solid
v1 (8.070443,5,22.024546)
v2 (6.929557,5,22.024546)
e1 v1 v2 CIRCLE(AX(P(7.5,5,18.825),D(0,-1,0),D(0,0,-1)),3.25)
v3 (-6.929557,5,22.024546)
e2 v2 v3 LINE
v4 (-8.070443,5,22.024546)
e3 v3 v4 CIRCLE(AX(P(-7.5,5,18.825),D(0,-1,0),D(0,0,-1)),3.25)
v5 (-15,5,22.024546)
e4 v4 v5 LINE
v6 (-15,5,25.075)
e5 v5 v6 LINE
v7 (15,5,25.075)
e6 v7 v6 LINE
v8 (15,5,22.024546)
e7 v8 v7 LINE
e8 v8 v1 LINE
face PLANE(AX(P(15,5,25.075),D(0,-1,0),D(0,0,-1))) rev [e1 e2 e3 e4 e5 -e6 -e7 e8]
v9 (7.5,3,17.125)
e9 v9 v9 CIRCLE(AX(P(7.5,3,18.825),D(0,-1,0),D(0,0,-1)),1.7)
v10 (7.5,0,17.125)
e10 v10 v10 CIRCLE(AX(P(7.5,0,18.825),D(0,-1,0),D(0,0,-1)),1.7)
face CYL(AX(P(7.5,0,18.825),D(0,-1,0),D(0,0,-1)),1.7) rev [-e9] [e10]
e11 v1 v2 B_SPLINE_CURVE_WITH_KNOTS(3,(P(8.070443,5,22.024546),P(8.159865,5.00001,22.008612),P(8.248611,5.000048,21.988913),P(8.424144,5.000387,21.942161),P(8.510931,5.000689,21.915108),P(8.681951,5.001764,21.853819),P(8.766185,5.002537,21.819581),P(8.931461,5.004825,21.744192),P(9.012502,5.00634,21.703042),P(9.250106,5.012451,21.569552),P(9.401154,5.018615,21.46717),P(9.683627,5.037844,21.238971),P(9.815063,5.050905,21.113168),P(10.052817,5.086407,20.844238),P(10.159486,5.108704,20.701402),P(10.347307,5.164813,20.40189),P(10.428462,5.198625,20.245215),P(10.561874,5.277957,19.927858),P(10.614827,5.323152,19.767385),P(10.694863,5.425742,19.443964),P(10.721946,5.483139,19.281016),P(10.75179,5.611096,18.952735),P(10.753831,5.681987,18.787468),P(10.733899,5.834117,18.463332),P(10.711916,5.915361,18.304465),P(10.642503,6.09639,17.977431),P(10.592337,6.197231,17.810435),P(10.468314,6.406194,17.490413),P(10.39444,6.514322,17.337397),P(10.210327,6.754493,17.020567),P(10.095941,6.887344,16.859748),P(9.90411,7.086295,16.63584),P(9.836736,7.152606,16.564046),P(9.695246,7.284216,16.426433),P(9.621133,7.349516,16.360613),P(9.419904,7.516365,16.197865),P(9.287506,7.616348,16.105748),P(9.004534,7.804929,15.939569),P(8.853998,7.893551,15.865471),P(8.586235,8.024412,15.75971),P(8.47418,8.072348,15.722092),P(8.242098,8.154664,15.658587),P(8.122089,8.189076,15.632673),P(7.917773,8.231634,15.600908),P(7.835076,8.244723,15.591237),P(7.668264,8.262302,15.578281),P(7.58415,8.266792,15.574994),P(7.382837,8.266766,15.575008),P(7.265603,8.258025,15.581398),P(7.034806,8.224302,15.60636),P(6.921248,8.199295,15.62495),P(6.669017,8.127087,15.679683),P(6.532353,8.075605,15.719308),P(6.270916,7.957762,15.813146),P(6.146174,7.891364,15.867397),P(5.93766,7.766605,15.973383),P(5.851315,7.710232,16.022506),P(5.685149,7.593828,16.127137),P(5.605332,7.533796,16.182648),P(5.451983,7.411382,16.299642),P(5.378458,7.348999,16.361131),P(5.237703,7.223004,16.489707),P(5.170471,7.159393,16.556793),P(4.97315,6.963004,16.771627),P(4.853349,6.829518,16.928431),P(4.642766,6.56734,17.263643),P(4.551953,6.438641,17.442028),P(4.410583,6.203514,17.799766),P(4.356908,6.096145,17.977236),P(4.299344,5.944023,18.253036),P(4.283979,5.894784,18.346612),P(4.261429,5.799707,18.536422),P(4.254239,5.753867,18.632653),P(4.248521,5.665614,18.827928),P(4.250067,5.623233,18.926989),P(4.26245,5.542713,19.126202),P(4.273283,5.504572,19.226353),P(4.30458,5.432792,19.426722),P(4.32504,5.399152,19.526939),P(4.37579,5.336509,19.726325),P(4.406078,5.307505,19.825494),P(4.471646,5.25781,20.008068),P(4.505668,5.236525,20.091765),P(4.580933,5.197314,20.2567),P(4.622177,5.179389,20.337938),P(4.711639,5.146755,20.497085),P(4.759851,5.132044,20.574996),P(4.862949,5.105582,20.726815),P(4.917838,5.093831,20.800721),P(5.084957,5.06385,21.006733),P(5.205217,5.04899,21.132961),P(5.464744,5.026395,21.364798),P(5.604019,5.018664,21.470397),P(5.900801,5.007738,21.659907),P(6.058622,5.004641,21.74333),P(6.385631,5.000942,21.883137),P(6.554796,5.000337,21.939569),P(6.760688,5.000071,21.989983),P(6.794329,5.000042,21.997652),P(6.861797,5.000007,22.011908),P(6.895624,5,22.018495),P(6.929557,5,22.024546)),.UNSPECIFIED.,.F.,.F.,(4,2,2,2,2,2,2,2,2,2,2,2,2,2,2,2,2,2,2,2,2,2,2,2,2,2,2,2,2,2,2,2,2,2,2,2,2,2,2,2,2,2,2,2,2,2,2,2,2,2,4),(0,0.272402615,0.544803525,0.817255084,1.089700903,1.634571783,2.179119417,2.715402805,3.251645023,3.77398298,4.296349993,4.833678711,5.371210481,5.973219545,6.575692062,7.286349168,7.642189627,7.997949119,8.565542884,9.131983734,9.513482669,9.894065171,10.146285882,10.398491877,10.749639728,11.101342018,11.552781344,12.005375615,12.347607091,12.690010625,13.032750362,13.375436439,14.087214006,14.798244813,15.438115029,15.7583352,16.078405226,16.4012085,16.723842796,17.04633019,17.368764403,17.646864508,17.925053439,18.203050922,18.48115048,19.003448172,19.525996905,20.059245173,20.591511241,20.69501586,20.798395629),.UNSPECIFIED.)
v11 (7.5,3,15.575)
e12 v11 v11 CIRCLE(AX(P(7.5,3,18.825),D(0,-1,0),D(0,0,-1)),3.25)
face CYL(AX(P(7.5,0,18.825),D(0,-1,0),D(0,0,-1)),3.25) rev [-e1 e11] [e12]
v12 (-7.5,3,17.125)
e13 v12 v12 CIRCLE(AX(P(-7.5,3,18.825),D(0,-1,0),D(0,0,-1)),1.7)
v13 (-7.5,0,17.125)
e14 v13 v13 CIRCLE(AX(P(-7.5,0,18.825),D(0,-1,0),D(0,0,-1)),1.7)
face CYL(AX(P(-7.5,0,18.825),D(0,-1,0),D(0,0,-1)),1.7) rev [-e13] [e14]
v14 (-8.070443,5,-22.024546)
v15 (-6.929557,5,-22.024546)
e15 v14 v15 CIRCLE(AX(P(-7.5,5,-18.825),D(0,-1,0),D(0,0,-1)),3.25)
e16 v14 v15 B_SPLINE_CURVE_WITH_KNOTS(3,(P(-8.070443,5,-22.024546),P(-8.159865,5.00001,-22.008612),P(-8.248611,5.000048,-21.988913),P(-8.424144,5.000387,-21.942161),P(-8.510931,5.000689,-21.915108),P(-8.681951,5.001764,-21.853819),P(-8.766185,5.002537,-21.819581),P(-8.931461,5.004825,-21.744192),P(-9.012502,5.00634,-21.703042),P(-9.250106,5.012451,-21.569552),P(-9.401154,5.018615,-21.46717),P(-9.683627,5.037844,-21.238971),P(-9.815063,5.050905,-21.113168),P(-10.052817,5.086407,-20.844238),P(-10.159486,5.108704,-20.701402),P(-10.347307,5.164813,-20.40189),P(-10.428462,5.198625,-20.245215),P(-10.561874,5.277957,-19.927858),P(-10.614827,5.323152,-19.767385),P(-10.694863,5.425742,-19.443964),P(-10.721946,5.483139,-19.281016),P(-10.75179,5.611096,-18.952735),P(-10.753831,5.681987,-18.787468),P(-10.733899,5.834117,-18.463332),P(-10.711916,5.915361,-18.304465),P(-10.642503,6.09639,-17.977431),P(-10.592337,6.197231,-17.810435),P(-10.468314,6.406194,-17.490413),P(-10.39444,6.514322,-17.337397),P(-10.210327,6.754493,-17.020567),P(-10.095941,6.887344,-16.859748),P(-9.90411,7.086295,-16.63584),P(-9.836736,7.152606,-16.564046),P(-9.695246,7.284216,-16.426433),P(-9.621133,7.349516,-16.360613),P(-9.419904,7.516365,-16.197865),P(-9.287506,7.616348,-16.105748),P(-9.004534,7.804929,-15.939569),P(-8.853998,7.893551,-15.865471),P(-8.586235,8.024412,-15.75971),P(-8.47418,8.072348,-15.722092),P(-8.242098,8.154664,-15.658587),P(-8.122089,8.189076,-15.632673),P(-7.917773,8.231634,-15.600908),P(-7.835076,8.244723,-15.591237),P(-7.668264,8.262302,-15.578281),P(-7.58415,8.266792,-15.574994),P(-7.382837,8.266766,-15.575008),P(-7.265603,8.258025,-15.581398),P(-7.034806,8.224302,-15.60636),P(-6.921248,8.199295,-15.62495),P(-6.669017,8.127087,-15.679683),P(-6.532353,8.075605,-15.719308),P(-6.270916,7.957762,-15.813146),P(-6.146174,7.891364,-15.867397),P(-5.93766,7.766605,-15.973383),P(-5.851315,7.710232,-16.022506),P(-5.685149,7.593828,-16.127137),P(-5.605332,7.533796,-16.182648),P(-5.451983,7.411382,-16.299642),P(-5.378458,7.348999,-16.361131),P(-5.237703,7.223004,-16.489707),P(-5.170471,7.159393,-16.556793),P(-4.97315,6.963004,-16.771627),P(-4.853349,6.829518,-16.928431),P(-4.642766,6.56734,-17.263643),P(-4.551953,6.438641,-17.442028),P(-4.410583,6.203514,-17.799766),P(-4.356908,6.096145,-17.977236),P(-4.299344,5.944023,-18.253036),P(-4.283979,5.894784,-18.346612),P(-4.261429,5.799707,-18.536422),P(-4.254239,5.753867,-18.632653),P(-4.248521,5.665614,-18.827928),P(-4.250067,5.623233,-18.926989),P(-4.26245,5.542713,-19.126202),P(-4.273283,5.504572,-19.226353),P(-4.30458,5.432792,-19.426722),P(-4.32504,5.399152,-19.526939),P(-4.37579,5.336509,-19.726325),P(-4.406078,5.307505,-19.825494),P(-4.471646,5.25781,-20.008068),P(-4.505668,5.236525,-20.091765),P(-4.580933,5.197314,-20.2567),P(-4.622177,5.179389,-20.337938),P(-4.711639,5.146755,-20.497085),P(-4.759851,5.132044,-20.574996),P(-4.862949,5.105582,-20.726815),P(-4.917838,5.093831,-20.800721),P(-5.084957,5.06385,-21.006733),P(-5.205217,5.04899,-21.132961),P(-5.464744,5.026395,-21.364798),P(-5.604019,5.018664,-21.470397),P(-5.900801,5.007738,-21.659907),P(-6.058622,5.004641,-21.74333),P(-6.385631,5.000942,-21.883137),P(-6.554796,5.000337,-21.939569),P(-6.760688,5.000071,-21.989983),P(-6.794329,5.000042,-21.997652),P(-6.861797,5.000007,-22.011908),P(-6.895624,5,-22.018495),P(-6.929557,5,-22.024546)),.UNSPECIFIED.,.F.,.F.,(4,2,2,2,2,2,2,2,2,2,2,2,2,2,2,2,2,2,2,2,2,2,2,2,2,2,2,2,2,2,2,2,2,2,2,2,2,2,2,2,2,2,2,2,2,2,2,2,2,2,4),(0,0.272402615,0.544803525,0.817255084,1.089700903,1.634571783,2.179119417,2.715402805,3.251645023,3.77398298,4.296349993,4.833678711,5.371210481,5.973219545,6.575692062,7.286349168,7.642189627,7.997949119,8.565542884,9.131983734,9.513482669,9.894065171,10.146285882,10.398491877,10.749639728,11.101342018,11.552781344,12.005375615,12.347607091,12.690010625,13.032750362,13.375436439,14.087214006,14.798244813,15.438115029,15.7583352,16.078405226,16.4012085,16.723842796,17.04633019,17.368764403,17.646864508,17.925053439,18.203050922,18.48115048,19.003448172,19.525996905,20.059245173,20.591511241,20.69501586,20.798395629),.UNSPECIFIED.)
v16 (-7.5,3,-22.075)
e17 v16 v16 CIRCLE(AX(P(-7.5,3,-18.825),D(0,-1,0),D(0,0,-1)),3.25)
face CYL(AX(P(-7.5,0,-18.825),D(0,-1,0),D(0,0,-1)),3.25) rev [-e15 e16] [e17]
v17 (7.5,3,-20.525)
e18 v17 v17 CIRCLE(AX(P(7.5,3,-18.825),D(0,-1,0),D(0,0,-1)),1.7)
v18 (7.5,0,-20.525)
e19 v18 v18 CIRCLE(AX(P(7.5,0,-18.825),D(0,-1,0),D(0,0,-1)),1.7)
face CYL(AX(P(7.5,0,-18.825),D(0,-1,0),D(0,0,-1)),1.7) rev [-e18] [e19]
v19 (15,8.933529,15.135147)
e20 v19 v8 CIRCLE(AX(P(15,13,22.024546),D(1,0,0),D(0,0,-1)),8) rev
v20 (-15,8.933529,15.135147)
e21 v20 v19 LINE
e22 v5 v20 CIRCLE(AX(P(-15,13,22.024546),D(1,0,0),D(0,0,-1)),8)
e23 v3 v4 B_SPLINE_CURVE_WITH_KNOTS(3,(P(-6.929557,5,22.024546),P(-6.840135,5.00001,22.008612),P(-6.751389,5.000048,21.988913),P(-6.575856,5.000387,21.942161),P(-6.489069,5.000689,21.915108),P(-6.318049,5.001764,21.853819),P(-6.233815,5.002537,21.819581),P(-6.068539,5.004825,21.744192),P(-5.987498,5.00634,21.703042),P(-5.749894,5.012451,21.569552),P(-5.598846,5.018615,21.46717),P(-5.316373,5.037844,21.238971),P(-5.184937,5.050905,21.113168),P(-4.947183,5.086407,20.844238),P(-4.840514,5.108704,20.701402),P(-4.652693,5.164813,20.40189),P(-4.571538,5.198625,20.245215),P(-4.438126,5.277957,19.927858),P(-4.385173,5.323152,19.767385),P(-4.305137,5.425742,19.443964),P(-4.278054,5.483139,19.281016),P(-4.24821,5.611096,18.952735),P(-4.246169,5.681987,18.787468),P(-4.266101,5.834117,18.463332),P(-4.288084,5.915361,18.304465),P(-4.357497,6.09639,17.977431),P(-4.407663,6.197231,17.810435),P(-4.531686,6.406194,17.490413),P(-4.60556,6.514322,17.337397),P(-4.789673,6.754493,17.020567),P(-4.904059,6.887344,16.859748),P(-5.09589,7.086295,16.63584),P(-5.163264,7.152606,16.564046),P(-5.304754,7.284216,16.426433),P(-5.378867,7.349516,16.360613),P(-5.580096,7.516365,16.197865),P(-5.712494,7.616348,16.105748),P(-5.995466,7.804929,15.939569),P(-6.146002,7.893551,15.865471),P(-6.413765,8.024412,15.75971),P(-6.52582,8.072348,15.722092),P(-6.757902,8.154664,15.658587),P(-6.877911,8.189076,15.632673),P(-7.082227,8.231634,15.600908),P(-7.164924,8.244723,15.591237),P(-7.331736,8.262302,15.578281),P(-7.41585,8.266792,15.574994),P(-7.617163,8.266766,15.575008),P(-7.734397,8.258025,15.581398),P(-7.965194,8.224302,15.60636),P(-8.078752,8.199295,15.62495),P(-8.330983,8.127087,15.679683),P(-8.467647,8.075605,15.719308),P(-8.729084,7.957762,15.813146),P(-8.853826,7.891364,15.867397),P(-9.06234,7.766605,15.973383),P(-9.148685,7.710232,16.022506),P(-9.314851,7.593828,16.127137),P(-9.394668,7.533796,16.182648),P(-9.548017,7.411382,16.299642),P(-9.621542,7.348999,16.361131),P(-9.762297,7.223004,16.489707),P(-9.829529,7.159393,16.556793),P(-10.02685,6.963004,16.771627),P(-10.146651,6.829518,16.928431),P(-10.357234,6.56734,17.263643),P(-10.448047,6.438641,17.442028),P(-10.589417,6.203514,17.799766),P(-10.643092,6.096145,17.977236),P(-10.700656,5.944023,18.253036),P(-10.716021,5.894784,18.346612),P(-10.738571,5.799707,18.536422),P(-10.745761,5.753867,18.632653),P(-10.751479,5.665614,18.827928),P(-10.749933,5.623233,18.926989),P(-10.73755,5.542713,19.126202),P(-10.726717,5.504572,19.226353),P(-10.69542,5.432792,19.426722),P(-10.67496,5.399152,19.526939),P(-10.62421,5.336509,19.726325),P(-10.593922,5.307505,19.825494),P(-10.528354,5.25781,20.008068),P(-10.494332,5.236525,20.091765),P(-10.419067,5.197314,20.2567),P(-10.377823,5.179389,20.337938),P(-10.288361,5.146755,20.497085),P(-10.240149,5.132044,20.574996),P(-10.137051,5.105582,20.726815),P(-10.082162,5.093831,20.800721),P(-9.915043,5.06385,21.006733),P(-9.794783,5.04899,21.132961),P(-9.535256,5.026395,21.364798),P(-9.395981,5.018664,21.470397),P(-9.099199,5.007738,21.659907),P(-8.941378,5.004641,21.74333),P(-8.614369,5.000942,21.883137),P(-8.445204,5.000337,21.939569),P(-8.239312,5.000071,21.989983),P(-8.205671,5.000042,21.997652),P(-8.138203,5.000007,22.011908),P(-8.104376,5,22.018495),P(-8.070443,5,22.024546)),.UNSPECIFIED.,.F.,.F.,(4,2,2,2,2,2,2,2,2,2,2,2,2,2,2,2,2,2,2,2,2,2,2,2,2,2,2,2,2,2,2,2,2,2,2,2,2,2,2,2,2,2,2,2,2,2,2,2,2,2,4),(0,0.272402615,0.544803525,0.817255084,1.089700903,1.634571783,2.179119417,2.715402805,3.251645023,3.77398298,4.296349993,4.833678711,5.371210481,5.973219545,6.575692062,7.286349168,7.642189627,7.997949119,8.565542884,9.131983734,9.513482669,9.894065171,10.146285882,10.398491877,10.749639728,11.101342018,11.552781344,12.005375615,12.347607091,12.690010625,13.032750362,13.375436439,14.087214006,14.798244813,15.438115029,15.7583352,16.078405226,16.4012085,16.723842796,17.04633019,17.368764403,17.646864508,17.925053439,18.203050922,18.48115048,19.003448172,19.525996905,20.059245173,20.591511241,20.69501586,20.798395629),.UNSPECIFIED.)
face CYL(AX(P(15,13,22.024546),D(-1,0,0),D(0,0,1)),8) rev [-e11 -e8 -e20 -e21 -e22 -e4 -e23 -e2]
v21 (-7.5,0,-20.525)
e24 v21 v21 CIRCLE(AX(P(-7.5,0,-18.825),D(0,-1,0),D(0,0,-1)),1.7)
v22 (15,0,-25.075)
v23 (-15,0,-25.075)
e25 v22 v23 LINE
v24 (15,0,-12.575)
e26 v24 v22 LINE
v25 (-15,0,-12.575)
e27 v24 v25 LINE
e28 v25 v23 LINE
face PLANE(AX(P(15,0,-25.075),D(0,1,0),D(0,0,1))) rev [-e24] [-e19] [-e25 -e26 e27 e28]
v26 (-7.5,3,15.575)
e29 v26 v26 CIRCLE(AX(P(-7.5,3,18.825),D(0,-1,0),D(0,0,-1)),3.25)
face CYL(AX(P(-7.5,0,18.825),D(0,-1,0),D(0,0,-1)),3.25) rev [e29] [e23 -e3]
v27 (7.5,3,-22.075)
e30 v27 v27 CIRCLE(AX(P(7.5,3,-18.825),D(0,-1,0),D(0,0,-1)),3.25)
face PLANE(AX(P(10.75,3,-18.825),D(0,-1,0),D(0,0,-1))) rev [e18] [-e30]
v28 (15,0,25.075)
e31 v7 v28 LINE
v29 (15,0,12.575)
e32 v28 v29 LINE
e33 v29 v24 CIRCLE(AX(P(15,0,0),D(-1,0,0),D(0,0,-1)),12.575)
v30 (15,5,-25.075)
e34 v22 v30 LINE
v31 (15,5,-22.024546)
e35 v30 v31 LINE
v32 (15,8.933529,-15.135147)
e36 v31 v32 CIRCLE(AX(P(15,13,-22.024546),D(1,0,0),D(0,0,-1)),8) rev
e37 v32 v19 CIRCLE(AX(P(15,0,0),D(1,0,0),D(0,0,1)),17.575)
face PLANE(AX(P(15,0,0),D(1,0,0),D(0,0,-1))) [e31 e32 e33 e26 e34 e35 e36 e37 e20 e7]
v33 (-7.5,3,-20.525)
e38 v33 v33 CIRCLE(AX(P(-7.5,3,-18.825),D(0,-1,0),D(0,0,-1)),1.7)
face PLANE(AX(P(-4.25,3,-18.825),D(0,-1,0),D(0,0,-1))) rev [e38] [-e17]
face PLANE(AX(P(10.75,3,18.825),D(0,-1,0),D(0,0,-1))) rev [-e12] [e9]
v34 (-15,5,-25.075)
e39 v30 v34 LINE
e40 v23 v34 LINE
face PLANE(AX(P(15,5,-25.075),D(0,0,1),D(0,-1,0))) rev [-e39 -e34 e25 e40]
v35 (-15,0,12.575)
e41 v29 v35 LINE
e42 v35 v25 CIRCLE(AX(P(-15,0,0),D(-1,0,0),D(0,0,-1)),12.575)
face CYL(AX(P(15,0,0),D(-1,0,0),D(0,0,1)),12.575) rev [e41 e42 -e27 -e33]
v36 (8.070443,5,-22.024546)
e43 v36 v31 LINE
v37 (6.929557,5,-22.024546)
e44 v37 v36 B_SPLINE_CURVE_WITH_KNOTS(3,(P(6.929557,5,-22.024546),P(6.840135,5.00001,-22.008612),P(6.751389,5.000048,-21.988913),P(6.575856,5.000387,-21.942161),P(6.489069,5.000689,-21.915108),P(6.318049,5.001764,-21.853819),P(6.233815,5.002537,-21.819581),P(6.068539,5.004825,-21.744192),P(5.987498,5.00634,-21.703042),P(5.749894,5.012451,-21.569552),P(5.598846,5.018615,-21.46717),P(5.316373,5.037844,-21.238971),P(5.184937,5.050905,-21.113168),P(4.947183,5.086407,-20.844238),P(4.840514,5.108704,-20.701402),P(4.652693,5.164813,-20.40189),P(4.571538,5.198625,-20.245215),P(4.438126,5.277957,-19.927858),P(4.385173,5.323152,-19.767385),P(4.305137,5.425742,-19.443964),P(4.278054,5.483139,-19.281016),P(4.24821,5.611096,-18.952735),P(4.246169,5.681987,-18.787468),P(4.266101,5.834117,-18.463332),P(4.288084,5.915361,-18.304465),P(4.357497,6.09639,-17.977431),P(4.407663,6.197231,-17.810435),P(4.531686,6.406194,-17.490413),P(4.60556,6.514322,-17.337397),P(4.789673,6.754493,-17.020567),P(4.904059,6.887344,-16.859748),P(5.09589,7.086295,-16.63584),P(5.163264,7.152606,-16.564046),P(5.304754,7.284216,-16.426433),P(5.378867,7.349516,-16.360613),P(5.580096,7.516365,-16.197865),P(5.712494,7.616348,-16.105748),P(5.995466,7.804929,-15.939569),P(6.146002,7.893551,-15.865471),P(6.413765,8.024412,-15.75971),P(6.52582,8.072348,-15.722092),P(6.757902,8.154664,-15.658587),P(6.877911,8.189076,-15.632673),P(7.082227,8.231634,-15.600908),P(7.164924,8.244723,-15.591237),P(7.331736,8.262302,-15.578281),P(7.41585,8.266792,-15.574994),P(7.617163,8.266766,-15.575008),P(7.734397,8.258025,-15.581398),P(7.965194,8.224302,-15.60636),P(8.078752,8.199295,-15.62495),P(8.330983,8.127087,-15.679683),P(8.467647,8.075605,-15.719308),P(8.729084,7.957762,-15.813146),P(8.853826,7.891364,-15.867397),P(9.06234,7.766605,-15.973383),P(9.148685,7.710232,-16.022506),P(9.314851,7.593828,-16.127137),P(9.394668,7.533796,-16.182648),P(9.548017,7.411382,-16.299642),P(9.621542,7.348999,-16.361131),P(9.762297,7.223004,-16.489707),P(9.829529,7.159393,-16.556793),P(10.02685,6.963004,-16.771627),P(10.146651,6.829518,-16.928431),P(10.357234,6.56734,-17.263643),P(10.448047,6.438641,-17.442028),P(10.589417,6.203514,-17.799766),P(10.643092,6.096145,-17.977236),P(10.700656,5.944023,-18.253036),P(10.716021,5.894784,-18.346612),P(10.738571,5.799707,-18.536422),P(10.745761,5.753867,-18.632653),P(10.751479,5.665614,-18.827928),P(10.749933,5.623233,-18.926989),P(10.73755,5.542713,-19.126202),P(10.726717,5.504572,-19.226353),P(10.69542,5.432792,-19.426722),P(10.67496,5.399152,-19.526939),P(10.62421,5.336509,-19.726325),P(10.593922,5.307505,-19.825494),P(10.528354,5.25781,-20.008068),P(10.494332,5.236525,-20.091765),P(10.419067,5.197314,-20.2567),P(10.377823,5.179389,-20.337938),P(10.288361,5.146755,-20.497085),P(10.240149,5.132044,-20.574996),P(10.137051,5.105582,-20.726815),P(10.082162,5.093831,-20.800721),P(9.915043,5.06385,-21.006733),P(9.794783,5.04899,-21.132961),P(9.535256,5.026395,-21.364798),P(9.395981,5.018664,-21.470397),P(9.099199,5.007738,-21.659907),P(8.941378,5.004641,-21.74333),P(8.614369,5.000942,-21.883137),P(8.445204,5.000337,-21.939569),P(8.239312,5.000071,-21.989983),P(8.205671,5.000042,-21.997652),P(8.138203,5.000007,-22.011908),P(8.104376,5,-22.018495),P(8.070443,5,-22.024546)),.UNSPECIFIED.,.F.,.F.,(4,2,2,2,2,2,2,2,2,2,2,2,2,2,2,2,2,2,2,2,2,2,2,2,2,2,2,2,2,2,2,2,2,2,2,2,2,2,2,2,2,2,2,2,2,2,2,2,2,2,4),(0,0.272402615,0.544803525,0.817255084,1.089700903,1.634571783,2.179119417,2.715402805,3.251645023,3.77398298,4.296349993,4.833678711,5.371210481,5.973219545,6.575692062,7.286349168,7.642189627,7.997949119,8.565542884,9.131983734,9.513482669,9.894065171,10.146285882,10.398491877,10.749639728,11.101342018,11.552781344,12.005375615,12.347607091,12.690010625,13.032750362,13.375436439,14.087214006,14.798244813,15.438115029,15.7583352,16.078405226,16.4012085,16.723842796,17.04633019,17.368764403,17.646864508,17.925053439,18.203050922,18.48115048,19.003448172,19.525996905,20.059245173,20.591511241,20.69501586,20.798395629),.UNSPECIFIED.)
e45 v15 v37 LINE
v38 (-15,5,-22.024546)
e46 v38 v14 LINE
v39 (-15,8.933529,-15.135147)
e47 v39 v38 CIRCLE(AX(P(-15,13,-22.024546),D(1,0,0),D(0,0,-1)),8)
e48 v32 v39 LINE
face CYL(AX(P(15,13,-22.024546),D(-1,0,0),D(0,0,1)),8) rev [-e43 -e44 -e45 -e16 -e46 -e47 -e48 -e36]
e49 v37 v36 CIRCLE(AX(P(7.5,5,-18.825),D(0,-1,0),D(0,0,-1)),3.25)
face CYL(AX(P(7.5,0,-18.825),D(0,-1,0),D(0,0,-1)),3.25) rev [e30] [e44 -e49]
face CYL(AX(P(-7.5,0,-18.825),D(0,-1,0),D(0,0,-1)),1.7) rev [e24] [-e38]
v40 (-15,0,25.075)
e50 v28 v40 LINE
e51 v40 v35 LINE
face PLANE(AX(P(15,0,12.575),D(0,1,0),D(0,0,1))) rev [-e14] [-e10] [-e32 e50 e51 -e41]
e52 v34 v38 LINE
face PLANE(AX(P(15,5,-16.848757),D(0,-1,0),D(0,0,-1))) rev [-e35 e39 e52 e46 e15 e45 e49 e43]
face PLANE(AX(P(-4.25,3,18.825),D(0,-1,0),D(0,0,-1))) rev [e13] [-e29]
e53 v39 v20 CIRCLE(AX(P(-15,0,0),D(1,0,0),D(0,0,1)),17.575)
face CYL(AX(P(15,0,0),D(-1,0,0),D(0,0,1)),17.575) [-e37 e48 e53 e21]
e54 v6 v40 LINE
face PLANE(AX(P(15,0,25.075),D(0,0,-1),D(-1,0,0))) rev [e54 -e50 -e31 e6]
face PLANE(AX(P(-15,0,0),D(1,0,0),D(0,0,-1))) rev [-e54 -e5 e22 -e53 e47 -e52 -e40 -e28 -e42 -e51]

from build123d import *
from build123d.topology import SkipClean

# Parameters (mm, degrees)
BOSS_EXTRUDE1_DEPTH           = 15
CBORE_FOR_M3_SHCS1_AT_2_COUNT = 2
CBORE_FOR_M3_SHCS1_AT_2_PITCH = 15
FILLET1_START                 = -15
FILLET1_DEPTH                 = 30
FILLET1_START_2               = 5
FILLET1_2_OUTLINE_R           = 3.25
FILLET1_2_DEPTH               = 3.266781676


with BuildPart() as part:
    # Sketch1 → Boss-Extrude1 (new, symmetric)
    with BuildSketch(Plane(origin=(0, 0, 0), x_dir=(0, 0, -1), z_dir=(1, 0, 0))):
        with BuildLine():
            Line((-12.575, 0), (-25.075, 0))
            Line((-25.075, 0), (-25.075, 5))
            Line((-25.075, 5), (-16.848757373, 5))
            ThreePointArc((-16.848757373, 5), (0, 17.575), (16.848757373, 5))
            Line((16.848757373, 5), (25.075, 5))
            Line((25.075, 5), (25.075, 0))
            Line((25.075, 0), (12.575, 0))
            ThreePointArc((12.575, 0), (0, 12.575), (-12.575, 0))
        make_face()
    extrude(amount=BOSS_EXTRUDE1_DEPTH, both=True)

    # Sketch4 → CBORE for M3 SHCS1 (revolve, cut)
    with BuildSketch(Plane(origin=(7.5, 0, 18.825), x_dir=(0, 0, -1), z_dir=(1, 0, 0))):
        Polygon((0, 0), (0, 17.575), (3.25, 17.575), (3.25, 3), (1.7, 3), (1.7, 0), align=None)
    cbore_for_m3_shcs1 = revolve(axis=Axis((7.5, -6.35, 18.825), (0, 1, 0)), mode=Mode.SUBTRACT)

    # CBORE for M3 SHCS1 at 2: CBORE for M3 SHCS1 ×2
    with Locations(*[(-i * CBORE_FOR_M3_SHCS1_AT_2_PITCH, 0, 0) for i in range(1, CBORE_FOR_M3_SHCS1_AT_2_COUNT)]):
        add(cbore_for_m3_shcs1, mode=Mode.SUBTRACT)

    # Mirror1: CBORE for M3 SHCS1 across plane
    add(cbore_for_m3_shcs1.mirror(Plane.XY), mode=Mode.SUBTRACT)

    # Mirror1 copy 1 sketch → Mirror1 copy 1 (revolve, cut)
    with BuildSketch(Plane(origin=(-7.5, 0, -18.825), x_dir=(0, 0, 1), z_dir=(1, 0, 0))):
        Polygon((0, 0), (0, -17.575), (3.25, -17.575), (3.25, -3), (1.7, -3), (1.7, 0), align=None)
    revolve(axis=Axis((-7.5, -6.35, -18.825), (0, -1, 0)), mode=Mode.SUBTRACT)

    # Fillet1: read off the stored shape, not the designer's step
    # Fillet1 outline → Fillet1 (add)
    with BuildSketch(Plane.YZ.offset(FILLET1_START)):
        with BuildLine():
            Line((5, -16.848757373), (5, -22.024545966))
            ThreePointArc((5, -22.024545966), (6.052634697, -18.057920782), (8.933528837, -15.135147423))
            ThreePointArc((8.933528837, -15.135147423), (7.019253609, -16.112439411), (5, -16.848757373))
        make_face()
        with BuildLine():
            ThreePointArc((5, 16.848757373), (7.019253609, 16.112439411), (8.933528837, 15.135147423))
            ThreePointArc((8.933528837, 15.135147423), (6.052634697, 18.057920782), (5, 22.024545966))
            Line((5, 22.024545966), (5, 16.848757373))
        make_face()
    extrude(amount=FILLET1_DEPTH)

    # Fillet1 2 outline → Fillet1 2 (cut)
    with SkipClean():  # the faces are left unmerged after this step: merging them gives an invalid solid
        with BuildSketch(Plane(origin=(0, 0, 0), x_dir=(1, 0, 0), z_dir=(0, 1, 0)).offset(FILLET1_START_2)):
            with Locations((7.5, 18.825)):
                Circle(FILLET1_2_OUTLINE_R)
            with Locations((-7.5, 18.825)):
                Circle(FILLET1_2_OUTLINE_R)
            with Locations((7.5, -18.825)):
                Circle(FILLET1_2_OUTLINE_R)
            with Locations((-7.5, -18.825)):
                Circle(FILLET1_2_OUTLINE_R)
        extrude(amount=FILLET1_2_DEPTH, mode=Mode.SUBTRACT)


solid = part.part
